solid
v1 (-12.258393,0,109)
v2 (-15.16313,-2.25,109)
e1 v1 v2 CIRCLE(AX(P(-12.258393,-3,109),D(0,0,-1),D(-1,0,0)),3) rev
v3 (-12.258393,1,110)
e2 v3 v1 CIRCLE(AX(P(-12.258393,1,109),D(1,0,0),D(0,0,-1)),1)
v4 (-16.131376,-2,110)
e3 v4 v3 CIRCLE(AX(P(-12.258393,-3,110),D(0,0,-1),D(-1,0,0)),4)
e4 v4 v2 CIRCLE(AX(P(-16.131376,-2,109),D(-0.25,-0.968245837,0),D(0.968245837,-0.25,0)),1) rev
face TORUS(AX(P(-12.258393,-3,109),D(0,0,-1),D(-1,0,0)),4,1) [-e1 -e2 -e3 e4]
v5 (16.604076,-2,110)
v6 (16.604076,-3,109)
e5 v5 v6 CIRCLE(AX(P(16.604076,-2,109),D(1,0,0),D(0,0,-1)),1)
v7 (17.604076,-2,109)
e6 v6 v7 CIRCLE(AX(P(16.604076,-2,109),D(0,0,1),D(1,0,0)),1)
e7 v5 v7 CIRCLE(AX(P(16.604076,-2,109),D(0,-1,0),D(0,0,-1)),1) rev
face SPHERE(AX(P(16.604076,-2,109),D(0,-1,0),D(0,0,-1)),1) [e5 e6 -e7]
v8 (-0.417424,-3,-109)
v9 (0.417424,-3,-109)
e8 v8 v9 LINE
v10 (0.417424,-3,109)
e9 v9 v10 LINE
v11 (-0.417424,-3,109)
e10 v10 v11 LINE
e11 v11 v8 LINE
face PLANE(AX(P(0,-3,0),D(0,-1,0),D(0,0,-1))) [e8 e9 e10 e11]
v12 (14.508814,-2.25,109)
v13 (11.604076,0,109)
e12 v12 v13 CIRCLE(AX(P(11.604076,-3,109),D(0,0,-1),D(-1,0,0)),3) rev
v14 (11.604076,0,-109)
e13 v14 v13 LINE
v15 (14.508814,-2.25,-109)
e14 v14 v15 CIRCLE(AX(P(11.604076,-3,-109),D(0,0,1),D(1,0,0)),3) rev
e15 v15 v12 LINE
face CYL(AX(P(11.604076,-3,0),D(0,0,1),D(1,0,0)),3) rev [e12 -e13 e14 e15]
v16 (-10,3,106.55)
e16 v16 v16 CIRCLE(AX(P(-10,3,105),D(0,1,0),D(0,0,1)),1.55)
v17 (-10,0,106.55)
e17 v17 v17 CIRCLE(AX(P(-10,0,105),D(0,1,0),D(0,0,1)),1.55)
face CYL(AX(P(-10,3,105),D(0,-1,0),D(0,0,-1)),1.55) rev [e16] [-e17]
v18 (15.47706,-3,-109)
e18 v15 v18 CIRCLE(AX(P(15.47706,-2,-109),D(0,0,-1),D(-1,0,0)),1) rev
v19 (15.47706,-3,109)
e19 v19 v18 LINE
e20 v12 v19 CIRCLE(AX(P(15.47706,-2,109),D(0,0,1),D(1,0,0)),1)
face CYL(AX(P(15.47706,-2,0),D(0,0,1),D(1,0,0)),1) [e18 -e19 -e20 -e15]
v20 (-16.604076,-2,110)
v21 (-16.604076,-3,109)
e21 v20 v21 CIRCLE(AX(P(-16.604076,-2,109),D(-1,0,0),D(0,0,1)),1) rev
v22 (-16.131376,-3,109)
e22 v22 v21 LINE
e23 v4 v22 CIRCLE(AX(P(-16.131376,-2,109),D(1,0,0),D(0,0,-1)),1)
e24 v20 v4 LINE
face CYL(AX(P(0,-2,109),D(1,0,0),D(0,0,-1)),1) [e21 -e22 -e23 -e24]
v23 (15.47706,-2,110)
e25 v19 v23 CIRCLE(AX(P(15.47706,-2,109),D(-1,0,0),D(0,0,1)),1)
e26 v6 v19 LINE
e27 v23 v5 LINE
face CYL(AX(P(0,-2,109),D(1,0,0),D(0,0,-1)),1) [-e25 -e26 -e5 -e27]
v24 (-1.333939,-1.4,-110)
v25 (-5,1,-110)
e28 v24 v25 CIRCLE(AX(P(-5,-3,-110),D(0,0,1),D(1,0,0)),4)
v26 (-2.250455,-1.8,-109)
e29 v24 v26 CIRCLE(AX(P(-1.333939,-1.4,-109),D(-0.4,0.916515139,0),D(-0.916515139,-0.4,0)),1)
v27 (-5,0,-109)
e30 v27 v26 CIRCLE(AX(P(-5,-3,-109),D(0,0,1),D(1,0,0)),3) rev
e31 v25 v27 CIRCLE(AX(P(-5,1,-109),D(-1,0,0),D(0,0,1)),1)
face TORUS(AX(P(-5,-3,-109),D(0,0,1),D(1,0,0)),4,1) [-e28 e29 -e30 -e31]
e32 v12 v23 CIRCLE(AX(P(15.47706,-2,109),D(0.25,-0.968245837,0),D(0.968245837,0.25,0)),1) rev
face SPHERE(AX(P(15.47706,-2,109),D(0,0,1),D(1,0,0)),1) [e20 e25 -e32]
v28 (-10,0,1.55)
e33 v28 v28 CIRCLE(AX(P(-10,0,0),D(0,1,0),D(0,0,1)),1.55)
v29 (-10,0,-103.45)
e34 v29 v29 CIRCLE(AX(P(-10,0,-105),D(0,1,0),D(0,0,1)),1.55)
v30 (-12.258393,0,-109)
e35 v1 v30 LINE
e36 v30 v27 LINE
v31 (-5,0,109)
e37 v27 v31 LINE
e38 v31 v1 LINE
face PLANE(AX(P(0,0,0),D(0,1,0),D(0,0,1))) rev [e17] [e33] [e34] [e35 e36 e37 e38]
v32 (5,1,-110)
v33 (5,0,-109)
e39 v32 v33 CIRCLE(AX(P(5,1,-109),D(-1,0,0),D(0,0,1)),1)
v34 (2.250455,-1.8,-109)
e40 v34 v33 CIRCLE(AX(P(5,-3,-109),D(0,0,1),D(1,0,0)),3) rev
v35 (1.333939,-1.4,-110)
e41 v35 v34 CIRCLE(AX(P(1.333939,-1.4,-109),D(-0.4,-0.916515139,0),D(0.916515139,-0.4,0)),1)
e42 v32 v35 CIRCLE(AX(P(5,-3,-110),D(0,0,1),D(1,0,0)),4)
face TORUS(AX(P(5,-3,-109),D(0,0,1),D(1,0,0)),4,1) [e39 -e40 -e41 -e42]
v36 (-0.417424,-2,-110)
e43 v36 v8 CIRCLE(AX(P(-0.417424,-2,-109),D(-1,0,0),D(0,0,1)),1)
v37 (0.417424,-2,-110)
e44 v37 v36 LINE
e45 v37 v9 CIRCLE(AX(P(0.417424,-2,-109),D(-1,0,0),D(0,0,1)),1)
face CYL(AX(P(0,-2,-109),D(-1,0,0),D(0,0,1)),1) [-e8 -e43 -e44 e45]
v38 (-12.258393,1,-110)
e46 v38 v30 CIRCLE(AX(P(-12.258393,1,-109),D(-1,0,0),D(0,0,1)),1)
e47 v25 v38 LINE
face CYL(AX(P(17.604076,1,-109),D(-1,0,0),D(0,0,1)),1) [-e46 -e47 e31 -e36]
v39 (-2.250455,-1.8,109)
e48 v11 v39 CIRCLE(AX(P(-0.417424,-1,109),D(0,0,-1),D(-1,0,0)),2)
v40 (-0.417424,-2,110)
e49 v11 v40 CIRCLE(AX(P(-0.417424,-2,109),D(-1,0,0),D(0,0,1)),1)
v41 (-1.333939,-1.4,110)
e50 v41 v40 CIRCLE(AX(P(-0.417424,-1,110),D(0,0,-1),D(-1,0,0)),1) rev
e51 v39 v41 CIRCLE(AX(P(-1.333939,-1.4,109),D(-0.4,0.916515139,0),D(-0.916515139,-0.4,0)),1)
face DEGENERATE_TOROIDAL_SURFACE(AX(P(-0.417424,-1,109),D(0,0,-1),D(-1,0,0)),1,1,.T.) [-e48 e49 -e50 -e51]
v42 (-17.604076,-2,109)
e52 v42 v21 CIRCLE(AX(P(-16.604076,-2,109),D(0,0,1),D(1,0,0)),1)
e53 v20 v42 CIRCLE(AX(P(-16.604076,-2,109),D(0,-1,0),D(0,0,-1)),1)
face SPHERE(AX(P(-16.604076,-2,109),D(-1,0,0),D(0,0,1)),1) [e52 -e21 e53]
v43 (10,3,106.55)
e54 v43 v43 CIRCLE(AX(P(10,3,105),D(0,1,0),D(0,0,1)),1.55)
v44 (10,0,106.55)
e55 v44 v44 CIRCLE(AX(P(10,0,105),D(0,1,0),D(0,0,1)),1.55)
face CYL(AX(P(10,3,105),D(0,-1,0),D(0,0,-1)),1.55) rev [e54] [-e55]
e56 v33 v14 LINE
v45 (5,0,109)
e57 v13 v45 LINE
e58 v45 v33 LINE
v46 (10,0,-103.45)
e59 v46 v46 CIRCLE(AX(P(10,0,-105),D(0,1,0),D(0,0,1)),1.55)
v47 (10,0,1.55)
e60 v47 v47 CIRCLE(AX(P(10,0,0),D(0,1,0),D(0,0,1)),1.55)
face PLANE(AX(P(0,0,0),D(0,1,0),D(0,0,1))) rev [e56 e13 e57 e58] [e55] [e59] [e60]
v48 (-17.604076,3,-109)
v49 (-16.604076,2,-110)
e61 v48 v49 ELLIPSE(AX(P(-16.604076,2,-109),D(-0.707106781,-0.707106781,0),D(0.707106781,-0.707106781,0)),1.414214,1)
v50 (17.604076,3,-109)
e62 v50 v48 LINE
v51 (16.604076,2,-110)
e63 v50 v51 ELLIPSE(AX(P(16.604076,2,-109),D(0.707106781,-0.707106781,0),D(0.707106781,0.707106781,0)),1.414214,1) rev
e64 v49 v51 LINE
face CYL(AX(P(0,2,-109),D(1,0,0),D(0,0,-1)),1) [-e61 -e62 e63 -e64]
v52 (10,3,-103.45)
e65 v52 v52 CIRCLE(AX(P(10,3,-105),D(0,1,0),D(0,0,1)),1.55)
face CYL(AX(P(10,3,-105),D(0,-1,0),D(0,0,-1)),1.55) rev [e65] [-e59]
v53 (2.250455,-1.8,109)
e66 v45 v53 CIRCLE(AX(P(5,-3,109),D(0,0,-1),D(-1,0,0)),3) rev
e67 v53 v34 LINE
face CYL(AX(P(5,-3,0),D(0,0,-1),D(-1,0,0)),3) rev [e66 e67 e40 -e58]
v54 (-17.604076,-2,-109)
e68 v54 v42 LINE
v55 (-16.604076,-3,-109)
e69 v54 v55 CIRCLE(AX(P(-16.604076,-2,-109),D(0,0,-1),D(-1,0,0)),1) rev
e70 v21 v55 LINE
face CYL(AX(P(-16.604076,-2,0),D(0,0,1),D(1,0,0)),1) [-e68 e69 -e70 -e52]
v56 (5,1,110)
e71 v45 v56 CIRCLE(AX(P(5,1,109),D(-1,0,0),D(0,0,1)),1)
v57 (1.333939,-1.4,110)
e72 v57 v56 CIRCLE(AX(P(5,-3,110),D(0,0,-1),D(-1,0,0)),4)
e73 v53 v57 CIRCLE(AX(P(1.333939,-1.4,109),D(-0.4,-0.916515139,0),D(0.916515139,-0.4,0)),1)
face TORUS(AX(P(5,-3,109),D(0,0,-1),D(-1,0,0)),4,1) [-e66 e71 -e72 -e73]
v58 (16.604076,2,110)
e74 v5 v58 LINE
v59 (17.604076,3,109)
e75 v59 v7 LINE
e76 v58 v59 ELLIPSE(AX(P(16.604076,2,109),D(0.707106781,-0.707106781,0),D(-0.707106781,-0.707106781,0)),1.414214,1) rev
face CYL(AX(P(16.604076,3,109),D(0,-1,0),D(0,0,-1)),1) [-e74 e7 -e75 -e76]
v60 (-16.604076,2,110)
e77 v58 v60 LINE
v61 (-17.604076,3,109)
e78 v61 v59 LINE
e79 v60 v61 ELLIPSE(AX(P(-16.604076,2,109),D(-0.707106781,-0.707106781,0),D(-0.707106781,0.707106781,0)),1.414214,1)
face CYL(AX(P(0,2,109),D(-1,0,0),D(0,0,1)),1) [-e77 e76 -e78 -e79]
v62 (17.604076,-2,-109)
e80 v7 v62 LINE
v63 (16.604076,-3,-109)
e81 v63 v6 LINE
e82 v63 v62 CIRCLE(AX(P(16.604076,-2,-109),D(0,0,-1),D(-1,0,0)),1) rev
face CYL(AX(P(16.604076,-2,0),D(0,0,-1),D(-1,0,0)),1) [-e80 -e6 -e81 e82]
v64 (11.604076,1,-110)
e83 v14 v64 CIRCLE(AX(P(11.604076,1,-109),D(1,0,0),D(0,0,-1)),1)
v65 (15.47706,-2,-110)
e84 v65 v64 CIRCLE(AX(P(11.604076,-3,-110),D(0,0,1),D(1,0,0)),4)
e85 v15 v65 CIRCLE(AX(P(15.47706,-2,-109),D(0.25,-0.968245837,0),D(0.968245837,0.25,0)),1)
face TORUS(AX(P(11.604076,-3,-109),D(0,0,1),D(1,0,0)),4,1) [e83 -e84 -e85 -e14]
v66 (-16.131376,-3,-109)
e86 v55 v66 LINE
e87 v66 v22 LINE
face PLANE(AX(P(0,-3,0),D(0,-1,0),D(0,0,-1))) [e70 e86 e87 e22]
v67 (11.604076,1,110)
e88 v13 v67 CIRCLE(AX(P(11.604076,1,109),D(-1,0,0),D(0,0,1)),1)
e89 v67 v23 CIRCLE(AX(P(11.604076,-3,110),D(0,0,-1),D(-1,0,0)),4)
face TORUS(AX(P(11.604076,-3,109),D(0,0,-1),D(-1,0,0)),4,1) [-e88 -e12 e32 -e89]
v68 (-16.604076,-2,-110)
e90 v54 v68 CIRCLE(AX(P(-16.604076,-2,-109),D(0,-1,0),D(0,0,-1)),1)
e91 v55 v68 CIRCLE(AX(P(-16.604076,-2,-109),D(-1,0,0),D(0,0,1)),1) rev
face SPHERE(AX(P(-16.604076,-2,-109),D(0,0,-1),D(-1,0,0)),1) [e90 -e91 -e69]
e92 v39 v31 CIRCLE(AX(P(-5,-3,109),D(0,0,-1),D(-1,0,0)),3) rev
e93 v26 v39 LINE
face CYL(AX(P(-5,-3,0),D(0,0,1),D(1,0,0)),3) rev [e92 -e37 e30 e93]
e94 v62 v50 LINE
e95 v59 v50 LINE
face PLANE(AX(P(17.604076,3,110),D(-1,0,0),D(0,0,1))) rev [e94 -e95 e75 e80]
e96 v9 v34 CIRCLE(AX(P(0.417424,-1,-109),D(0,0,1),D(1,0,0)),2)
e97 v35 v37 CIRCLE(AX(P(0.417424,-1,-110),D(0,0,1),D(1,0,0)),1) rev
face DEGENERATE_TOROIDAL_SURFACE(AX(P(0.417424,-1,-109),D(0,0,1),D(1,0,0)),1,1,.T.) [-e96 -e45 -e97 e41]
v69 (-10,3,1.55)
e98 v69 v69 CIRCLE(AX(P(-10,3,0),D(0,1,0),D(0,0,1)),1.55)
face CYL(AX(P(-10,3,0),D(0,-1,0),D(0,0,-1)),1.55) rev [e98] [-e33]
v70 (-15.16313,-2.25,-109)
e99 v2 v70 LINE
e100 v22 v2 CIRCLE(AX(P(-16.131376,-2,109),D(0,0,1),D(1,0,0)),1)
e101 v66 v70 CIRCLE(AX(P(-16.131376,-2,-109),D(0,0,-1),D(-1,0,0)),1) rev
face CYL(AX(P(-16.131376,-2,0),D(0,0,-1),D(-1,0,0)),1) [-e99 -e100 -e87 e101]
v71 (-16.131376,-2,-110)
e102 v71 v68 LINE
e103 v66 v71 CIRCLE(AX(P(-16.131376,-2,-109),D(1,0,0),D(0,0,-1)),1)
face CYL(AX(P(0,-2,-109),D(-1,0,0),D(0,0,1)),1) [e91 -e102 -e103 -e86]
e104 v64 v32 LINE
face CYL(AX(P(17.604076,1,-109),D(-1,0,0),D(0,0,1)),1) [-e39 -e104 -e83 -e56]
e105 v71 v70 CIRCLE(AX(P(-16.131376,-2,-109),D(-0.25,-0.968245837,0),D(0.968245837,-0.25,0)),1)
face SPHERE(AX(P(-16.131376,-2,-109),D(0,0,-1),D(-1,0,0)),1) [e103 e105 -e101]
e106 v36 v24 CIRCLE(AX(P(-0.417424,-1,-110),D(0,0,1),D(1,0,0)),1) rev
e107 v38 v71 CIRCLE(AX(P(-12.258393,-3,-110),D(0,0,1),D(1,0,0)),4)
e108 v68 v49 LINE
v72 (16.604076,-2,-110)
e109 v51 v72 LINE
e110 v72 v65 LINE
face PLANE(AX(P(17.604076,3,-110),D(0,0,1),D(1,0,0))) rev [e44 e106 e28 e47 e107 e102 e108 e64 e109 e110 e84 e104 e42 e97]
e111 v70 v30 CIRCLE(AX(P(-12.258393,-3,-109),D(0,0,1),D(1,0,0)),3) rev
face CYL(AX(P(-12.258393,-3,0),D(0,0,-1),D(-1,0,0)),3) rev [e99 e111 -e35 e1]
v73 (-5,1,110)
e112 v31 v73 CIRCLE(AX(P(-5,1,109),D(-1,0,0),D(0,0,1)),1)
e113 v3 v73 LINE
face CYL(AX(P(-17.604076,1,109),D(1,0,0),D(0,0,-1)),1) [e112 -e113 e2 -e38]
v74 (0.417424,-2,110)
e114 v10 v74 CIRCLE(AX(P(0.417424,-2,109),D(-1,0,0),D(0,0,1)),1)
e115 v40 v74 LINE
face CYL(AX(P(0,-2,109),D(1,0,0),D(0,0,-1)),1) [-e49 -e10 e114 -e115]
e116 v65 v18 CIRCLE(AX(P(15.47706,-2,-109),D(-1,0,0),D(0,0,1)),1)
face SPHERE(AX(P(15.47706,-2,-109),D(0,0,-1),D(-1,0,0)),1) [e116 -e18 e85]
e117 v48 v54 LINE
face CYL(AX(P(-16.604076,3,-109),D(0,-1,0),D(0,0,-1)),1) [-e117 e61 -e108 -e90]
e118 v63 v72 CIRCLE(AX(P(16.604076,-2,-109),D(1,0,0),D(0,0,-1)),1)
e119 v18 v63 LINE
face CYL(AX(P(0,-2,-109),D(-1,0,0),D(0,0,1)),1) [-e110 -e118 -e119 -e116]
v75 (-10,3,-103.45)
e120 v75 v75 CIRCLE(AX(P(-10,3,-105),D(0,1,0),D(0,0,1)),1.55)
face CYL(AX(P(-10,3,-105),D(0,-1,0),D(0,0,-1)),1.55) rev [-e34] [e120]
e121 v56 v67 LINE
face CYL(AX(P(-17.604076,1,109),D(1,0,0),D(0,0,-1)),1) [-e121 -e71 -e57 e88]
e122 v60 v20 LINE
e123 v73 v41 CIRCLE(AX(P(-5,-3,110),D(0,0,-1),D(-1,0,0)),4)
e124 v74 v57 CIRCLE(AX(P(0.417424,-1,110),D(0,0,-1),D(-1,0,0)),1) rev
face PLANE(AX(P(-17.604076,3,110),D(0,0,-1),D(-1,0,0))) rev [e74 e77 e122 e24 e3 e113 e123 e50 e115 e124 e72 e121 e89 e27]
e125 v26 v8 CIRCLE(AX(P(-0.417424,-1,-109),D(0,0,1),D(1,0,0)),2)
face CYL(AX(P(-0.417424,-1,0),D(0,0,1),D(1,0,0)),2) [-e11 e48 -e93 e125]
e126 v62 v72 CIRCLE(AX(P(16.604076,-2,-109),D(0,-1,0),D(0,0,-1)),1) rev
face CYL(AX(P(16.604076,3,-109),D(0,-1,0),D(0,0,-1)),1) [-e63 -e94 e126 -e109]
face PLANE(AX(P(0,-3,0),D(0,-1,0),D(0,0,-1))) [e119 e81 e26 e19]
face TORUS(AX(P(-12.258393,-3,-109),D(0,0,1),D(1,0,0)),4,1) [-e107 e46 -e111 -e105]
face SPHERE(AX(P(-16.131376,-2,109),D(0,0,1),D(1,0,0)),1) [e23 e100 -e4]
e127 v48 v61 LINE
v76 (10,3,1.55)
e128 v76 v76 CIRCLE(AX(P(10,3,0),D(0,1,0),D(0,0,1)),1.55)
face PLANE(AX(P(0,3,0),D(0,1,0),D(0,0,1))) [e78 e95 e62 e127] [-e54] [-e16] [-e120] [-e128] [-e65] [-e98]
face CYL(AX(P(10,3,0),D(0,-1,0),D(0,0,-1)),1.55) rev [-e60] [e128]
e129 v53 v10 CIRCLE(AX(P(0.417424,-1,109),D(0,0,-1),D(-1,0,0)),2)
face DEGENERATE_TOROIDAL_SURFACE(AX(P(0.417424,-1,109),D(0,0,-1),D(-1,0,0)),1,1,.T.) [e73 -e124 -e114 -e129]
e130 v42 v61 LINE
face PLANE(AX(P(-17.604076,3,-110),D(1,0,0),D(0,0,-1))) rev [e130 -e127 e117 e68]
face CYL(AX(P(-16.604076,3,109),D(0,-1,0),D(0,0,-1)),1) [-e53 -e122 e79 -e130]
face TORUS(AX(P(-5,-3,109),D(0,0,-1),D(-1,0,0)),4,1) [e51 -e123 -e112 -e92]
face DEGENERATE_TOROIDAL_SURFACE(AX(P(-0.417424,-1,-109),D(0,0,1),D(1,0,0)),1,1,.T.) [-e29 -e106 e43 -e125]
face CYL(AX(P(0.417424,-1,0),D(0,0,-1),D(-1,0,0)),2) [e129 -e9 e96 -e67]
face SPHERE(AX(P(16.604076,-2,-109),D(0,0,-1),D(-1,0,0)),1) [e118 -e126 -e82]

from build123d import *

# Parameters (mm, degrees)
SKETCH_1_W      = 35.208152802
SKETCH_1_H      = 220
SKETCH_1_R      = 1.55
EXTRUDE_1_DEPTH = 3
SKETCH_2_W      = 3
SKETCH_2_H      = 220
SKETCH_2_W_2    = 2
SKETCH_2_W_3    = 2.345683745
EXTRUDE_2_DEPTH = 3
FILLET_1_R      = 3
FILLET_2_R      = 2
FILLET_3_R      = 1


with BuildPart() as part:
    # 草图1 → 凸台-拉伸1 (new body)
    with BuildSketch(Plane(origin=(0, 0, 0), x_dir=(1, 0, 0), z_dir=(0, 1, 0))):
        Rectangle(SKETCH_1_W, SKETCH_1_H)
        with Locations(Location((10, -105, 0), (0, 0, 270))):
            Circle(SKETCH_1_R, mode=Mode.SUBTRACT)
        with Locations(Location((-10, -105, 0), (0, 0, 270))):
            Circle(SKETCH_1_R, mode=Mode.SUBTRACT)
        with Locations(Location((10, 0, 0), (0, 0, 270))):
            Circle(SKETCH_1_R, mode=Mode.SUBTRACT)
        with Locations(Location((-10, 0, 0), (0, 0, 270))):
            Circle(SKETCH_1_R, mode=Mode.SUBTRACT)
        with Locations(Location((10, 105, 0), (0, 0, 270))):
            Circle(SKETCH_1_R, mode=Mode.SUBTRACT)
        with Locations(Location((-10, 105, 0), (0, 0, 270))):
            Circle(SKETCH_1_R, mode=Mode.SUBTRACT)
    extrude(amount=EXTRUDE_1_DEPTH)

    # 草图2 → 凸台-拉伸2 (add)
    with BuildSketch(Plane.XZ):
        with Locations((16.104076401, 0)):
            Rectangle(SKETCH_2_W, SKETCH_2_H)
        with Locations((-1, 0)):
            Rectangle(SKETCH_2_W_2, SKETCH_2_H)
        with Locations((1, 0)):
            Rectangle(SKETCH_2_W_2, SKETCH_2_H)
        with Locations((-16.431234528, 0)):
            Rectangle(SKETCH_2_W_3, SKETCH_2_H)
    extrude(amount=EXTRUDE_2_DEPTH)

    # 圆角1
    fillet_1_edges = [part.edges().sort_by_distance(p)[0] for p in [
        (14.604076401, 0, 0),
        (2, 0, 0),
        (-2, 0, 0),
        (-15.258392656, 0, 0),
    ]]
    fillet(fillet_1_edges, radius=FILLET_1_R - 0.0001)  # a hair under: the kernel refuses the full size

    # 圆角2
    fillet_2_edges = [part.edges().sort_by_distance(p)[0] for p in [
        (-2, -3, 0),
        (2, -3, 0),
    ]]
    fillet(fillet_2_edges, radius=FILLET_2_R)

    # 圆角3
    fillet_3_edges = [part.edges().sort_by_distance(p)[0] for p in [
        (-3.356770668, -0.490014343, -110),
        (0, -3, 110),
        (3.356770668, -0.490014343, 110),
        (1.512845841, -2.673312882, 110),
        (-1.512845841, -2.673312882, 110),
        (0, -3, -110),
        (1.512845841, -2.673312882, -110),
        (-1.512845841, -2.673312882, -110),
        (0, 3, -110),
        (16.104076401, -3, 110),
        (14.604076401, -3, 0),
        (16.104076401, -3, -110),
        (17.604076401, -3, 0),
        (-15.258392656, -3, 0),
        (-16.431234528, -3, 110),
        (-17.604076401, -3, 0),
        (-16.431234528, -3, -110),
        (-17.604076401, 0, -110),
        (17.604076401, 0, -110),
        (17.604076401, 0, 110),
        (-17.604076401, 0, 110),
        (8.3020382, 0, -110),
        (8.3020382, 0, 110),
        (-8.629196328, 0, 110),
        (-8.629196328, 0, -110),
        (13.725426034, -0.878650367, -110),
        (13.725426034, -0.878650367, 110),
        (0, 3, 110),
        (3.356770668, -0.490014343, -110),
        (-3.356770668, -0.490014343, 110),
        (-14.379742289, -0.878650367, -110),
        (-14.379742289, -0.878650367, 110),
    ]]
    fillet(fillet_3_edges, radius=FILLET_3_R)


solid = part.part
